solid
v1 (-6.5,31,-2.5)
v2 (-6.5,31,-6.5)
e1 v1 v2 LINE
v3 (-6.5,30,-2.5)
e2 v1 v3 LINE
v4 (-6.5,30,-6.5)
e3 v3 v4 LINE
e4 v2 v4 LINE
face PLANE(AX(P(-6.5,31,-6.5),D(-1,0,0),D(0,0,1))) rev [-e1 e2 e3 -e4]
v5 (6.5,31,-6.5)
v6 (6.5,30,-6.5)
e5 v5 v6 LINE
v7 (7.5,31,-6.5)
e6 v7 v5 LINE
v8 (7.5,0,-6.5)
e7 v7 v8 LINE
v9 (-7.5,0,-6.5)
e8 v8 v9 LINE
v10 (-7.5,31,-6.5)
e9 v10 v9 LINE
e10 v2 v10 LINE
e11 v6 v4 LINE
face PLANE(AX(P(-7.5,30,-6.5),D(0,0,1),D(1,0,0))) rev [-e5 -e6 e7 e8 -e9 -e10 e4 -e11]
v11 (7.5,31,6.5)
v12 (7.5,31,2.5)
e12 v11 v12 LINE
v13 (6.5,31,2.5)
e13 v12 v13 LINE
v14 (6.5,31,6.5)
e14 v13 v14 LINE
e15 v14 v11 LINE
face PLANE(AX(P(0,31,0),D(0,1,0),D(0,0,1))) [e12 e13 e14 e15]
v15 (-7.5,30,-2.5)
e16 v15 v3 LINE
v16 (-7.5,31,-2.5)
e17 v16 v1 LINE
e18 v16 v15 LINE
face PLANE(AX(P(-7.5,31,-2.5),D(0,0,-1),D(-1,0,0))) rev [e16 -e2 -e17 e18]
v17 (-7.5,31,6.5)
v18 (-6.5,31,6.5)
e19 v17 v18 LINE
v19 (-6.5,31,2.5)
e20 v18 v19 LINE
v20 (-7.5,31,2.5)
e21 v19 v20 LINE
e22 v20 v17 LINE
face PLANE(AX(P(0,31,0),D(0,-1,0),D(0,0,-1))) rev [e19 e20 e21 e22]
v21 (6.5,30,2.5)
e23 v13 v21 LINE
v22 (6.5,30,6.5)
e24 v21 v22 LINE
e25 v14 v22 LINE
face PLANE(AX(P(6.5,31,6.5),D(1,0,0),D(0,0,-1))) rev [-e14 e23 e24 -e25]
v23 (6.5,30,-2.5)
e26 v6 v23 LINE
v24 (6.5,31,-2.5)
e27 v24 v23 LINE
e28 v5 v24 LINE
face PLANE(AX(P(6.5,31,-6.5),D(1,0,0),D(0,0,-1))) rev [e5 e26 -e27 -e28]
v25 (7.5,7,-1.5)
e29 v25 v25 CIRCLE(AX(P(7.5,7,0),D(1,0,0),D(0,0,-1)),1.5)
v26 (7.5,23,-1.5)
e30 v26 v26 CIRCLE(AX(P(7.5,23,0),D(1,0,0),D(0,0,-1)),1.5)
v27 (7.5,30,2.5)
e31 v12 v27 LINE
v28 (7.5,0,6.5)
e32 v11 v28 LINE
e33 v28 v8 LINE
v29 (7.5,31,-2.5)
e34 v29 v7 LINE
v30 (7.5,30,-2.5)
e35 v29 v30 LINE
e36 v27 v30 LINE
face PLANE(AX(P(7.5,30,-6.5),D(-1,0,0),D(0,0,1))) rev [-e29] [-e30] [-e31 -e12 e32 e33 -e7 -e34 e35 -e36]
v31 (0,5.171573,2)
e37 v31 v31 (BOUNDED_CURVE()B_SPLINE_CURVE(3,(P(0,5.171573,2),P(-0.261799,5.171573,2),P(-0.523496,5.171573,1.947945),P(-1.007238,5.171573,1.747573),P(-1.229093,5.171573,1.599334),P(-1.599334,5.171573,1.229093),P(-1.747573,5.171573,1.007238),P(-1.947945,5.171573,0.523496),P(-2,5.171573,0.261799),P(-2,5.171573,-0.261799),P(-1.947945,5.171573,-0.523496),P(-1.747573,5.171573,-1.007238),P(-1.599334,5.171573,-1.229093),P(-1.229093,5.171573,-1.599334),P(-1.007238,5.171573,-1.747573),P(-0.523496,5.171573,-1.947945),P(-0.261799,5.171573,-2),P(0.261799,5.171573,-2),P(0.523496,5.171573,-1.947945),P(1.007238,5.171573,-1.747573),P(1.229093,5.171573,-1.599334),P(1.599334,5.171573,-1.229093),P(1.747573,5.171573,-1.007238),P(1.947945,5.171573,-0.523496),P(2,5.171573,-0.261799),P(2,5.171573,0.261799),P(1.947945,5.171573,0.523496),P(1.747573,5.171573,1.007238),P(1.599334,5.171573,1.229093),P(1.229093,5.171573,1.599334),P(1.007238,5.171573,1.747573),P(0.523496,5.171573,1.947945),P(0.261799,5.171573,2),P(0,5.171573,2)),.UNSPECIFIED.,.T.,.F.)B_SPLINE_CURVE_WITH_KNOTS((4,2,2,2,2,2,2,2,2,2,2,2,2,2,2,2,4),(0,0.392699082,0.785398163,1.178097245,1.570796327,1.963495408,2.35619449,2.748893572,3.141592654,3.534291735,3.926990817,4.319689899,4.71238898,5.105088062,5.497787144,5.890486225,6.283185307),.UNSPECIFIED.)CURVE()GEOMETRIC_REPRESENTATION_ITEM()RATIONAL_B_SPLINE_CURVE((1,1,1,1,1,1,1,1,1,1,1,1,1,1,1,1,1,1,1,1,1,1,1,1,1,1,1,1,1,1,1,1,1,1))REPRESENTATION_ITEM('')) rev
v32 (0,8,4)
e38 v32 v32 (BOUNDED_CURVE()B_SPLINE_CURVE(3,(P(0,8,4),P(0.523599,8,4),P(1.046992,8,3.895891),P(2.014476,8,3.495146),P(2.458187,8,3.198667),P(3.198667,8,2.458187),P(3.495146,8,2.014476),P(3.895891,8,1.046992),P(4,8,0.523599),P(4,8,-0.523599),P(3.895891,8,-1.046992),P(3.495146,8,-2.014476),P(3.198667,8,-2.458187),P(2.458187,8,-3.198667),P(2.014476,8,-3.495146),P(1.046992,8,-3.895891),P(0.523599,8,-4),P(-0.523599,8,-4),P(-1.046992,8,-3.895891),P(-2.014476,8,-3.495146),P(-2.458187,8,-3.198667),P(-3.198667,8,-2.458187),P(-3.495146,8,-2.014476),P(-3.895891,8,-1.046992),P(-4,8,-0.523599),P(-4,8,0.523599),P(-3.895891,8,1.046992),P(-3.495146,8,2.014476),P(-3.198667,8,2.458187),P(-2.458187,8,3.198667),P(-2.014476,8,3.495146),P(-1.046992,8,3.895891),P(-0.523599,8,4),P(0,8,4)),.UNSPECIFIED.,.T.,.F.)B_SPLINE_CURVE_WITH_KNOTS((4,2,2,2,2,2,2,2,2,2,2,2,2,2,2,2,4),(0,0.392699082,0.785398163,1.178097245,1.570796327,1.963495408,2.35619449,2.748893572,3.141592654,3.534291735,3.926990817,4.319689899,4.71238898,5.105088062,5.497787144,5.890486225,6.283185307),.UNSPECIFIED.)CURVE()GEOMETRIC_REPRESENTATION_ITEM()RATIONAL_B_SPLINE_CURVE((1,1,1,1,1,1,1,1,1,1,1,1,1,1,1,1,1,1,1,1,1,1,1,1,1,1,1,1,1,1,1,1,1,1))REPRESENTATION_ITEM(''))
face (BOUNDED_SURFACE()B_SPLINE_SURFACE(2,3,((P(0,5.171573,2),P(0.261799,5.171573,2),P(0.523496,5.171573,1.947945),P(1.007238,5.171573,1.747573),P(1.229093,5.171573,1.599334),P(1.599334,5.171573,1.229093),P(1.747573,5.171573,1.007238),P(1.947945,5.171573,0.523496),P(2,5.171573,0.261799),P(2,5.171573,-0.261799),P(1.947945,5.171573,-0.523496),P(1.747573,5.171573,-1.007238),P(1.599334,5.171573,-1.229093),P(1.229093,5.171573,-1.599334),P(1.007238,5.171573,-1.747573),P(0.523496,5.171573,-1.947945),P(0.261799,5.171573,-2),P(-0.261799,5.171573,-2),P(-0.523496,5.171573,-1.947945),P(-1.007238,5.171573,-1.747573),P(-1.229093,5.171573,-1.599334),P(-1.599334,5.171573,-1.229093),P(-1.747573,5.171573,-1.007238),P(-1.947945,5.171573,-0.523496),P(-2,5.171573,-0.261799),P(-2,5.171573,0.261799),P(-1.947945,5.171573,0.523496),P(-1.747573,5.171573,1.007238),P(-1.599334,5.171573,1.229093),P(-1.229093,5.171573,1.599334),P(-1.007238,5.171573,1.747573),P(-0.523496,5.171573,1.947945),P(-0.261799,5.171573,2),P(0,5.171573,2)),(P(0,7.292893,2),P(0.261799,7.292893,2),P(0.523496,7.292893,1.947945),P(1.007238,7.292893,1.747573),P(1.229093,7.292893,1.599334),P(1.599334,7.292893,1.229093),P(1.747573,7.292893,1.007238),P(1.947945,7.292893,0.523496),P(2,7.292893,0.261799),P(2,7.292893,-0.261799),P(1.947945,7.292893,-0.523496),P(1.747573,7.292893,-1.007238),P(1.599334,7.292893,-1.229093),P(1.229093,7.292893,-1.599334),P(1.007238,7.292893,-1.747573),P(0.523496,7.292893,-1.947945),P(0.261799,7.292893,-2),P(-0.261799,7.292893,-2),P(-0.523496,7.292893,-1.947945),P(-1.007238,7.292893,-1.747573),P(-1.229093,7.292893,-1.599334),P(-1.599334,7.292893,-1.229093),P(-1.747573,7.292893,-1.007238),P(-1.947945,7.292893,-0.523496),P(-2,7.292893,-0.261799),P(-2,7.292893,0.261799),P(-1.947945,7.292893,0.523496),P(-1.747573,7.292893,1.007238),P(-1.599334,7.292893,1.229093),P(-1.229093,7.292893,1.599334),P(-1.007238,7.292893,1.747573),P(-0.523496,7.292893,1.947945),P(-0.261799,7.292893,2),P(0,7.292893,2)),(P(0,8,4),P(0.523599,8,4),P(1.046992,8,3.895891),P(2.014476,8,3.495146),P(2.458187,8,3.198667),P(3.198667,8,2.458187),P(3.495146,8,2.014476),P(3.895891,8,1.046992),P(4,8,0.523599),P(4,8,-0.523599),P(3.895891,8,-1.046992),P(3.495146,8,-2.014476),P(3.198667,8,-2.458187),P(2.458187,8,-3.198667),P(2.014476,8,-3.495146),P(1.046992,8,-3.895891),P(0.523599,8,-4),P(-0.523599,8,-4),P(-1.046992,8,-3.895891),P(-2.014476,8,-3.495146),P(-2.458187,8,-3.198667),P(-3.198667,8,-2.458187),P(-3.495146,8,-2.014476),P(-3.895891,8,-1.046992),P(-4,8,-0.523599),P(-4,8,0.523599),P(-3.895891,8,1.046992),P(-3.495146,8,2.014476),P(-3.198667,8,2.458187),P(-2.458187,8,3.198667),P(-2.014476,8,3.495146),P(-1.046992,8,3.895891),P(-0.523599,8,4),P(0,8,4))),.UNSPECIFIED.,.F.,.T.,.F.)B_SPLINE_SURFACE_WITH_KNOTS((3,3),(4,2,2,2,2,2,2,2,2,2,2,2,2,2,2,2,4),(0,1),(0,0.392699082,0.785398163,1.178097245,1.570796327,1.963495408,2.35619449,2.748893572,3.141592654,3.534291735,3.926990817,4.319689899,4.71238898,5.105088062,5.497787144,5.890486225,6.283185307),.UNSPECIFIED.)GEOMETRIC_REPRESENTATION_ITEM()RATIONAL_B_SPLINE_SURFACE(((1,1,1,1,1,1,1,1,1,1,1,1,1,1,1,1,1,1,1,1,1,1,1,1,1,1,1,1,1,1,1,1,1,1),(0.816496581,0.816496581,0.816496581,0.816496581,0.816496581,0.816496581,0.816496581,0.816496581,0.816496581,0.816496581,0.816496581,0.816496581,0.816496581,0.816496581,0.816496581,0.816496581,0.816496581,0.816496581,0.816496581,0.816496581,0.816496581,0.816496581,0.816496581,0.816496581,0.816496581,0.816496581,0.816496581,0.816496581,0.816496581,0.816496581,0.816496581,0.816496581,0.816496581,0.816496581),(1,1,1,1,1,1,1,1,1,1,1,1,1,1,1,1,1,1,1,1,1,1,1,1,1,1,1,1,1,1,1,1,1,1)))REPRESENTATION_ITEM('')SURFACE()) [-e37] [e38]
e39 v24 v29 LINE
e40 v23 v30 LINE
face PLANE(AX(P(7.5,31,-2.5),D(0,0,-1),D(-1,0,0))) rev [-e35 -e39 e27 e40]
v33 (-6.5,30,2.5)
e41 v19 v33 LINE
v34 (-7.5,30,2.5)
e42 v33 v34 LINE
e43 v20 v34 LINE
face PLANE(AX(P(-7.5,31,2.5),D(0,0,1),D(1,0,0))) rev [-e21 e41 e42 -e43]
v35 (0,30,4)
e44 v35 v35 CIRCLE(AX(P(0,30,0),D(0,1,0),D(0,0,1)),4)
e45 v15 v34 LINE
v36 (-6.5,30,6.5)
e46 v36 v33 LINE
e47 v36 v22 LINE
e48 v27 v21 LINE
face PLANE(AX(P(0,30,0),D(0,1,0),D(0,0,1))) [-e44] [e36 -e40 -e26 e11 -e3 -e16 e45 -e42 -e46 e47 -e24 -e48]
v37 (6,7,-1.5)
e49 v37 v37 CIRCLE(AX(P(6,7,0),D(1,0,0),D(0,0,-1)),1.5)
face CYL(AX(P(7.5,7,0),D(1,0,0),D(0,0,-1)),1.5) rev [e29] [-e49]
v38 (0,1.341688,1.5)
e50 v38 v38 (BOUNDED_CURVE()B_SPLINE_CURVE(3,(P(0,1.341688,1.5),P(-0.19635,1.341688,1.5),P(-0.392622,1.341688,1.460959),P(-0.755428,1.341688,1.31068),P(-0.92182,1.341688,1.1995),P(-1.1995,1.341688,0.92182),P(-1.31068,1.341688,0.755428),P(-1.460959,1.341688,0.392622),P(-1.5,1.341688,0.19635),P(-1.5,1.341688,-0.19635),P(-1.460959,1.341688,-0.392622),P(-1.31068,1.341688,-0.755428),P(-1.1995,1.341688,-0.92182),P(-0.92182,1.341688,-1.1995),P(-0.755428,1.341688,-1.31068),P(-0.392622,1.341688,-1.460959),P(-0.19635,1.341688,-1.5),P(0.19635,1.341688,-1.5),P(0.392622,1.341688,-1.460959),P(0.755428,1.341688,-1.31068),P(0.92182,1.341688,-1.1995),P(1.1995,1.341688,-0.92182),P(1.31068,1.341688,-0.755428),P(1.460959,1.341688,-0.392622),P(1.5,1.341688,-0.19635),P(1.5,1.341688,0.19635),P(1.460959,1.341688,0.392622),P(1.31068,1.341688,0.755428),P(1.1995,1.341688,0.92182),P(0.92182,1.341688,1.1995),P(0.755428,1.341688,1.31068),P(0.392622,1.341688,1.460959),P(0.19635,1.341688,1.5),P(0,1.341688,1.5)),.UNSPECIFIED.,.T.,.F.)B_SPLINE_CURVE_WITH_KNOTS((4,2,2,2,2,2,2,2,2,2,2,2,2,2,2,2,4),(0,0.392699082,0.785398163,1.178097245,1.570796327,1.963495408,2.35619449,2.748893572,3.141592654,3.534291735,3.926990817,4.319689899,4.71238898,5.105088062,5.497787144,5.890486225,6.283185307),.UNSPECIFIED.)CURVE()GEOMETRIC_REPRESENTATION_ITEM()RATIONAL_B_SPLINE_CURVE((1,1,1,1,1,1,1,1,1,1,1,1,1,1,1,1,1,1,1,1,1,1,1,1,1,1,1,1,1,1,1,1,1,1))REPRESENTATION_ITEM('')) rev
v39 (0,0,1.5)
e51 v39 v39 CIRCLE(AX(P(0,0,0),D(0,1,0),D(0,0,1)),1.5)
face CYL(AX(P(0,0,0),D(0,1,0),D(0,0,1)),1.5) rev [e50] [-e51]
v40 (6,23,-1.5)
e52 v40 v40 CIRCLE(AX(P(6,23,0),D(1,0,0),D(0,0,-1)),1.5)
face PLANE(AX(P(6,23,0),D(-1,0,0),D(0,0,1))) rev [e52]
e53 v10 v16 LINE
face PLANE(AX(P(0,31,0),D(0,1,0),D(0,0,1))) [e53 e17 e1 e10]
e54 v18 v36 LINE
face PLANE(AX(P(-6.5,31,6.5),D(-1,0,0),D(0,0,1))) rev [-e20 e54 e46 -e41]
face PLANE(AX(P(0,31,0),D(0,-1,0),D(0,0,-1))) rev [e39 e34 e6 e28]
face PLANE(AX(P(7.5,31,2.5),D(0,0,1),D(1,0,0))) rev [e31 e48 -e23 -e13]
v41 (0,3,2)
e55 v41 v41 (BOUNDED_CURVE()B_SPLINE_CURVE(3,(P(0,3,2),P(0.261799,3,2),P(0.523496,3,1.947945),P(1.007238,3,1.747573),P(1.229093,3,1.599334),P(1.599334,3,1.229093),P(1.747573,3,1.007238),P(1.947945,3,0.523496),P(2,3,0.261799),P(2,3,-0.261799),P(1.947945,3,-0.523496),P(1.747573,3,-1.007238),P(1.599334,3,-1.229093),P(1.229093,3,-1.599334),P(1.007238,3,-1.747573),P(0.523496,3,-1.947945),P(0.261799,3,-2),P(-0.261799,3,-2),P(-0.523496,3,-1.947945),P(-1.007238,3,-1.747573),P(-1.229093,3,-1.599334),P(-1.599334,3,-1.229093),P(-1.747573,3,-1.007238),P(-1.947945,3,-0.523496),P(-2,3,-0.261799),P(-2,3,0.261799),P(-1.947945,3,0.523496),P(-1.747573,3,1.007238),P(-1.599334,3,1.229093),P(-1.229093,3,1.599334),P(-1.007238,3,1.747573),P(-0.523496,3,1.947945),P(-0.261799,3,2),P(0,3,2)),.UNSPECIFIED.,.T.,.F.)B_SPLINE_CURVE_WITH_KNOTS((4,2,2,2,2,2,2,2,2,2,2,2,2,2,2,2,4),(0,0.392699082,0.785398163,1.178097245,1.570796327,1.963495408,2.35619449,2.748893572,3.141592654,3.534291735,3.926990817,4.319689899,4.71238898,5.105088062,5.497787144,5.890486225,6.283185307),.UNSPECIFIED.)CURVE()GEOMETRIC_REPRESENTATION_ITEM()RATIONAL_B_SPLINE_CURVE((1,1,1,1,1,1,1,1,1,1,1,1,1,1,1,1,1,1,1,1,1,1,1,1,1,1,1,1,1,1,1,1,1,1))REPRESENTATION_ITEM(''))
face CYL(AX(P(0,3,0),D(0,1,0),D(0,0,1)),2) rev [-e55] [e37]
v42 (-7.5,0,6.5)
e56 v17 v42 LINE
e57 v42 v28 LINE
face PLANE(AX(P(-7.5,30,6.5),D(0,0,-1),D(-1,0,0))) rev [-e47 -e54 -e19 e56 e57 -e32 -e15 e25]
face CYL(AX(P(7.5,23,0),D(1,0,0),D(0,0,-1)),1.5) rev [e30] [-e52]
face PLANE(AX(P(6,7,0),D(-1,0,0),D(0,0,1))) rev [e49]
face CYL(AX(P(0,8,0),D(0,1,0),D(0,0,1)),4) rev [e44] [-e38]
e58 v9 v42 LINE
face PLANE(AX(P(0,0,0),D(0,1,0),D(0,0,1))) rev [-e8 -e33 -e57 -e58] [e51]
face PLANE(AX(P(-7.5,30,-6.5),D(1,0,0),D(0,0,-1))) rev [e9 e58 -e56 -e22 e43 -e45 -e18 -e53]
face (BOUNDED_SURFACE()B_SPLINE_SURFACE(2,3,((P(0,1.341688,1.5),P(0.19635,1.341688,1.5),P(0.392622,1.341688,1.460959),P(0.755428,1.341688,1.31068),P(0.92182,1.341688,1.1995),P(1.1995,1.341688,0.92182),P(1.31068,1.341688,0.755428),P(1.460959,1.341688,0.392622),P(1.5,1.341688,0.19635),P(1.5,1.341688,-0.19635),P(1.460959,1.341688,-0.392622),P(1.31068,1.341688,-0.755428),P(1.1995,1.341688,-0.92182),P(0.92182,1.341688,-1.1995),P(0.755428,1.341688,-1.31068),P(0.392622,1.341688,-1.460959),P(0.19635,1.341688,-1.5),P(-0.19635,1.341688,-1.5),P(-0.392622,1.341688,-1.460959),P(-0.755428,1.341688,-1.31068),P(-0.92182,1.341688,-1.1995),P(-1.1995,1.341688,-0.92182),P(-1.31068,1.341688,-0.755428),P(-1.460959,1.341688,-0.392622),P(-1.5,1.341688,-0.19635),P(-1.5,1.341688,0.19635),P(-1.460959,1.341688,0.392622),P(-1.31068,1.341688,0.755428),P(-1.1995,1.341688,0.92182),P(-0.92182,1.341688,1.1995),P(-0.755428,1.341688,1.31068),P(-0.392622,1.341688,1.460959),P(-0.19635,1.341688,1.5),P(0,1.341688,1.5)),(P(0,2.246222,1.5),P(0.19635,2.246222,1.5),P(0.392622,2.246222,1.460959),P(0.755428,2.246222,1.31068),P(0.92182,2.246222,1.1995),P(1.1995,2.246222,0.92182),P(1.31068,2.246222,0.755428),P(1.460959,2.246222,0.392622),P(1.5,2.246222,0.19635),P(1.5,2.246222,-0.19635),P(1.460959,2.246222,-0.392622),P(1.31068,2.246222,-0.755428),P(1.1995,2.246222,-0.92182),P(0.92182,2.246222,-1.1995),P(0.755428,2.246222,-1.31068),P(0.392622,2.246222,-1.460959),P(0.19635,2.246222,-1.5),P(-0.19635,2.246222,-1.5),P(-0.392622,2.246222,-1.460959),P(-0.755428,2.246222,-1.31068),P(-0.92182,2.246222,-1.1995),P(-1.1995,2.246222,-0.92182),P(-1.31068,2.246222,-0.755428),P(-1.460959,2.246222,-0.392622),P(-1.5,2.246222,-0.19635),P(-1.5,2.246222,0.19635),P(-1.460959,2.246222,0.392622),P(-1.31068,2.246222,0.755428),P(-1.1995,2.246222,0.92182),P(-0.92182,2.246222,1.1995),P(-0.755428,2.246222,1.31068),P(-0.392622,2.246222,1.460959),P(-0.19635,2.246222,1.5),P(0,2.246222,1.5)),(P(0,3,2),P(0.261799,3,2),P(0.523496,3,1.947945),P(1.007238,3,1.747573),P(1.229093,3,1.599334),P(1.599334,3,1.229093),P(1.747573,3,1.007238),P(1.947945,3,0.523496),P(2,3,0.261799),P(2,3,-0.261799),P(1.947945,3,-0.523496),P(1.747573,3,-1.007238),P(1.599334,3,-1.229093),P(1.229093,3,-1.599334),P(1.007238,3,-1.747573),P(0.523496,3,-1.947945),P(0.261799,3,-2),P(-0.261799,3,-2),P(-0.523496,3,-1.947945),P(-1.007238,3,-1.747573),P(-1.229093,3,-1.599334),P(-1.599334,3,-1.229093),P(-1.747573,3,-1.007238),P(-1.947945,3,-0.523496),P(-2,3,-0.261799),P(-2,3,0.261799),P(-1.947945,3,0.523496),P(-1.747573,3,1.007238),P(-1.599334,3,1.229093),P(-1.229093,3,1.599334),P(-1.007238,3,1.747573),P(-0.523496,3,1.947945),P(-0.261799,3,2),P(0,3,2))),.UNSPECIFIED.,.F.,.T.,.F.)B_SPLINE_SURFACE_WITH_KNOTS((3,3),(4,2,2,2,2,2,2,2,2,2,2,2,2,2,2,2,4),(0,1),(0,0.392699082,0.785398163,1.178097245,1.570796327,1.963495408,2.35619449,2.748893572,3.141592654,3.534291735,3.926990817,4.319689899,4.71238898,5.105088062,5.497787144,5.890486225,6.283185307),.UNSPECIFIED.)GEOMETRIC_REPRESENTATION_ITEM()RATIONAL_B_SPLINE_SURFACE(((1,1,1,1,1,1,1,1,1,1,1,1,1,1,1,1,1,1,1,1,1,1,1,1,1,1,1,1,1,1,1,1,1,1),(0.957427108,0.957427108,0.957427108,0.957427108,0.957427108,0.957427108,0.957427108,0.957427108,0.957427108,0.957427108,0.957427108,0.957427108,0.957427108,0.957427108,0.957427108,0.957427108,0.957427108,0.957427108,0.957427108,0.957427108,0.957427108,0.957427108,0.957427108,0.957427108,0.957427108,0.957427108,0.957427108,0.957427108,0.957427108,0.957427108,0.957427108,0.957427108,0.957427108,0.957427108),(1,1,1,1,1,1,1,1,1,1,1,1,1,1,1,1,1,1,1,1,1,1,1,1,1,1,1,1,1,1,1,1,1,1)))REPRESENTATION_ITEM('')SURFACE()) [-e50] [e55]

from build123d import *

# Parameters (mm, degrees)
SKETCH2_W                    = 15
SKETCH2_H                    = 13
BOSS_EXTRUDE1_DEPTH          = 30
SKETCH3_W                    = 1
SKETCH3_H                    = 4
BOSS_EXTRUDE2_DEPTH          = 1
SKETCH4_R                    = 4
CUT_EXTRUDE3_DEPTH           = 22
SKETCH5_R                    = 2
CUT_EXTRUDE4_DEPTH           = 5
SKETCH7_R                    = 1.5
CUT_EXTRUDE5_DEPTH           = 30.706901555
FILLET4_R                    = 3
FILLET5_R                    = 3
F_8_0_3_DIAMETER_HOLE1_D     = 3
F_8_0_3_DIAMETER_HOLE1_DEPTH = 1.5


with BuildPart() as part:
    # Sketch2 → Boss-Extrude1 (new body)
    with BuildSketch(Plane(origin=(0, 0, 0), x_dir=(1, 0, 0), z_dir=(0, 1, 0))):
        Rectangle(SKETCH2_W, SKETCH2_H)
    extrude(amount=BOSS_EXTRUDE1_DEPTH)

    # Sketch3 → Boss-Extrude2 (add)
    with BuildSketch(Plane(origin=(0, 30, 0), x_dir=(1, 0, 0), z_dir=(0, 1, 0))):
        with Locations((7, 4.5)):
            Rectangle(SKETCH3_W, SKETCH3_H)
        with Locations((7, -4.5)):
            Rectangle(SKETCH3_W, SKETCH3_H)
        with Locations((-7, -4.5)):
            Rectangle(SKETCH3_W, SKETCH3_H)
        with Locations((-7, 4.5)):
            Rectangle(SKETCH3_W, SKETCH3_H)
    extrude(amount=BOSS_EXTRUDE2_DEPTH)

    # Sketch4 → Cut-Extrude3 (cut)
    with BuildSketch(Plane(origin=(0, 30, 0), x_dir=(1, 0, 0), z_dir=(0, 1, 0))):
        with Locations(Location((0, 0, 0), (0, 0, 270))):
            Circle(SKETCH4_R)
    extrude(amount=-CUT_EXTRUDE3_DEPTH, mode=Mode.SUBTRACT)

    # Sketch5 → Cut-Extrude4 (cut)
    with BuildSketch(Plane(origin=(0, 8, 0), x_dir=(1, 0, 0), z_dir=(0, 1, 0))):
        with Locations(Location((0, 0, 0), (0, 0, 270))):
            Circle(SKETCH5_R)
    extrude(amount=-CUT_EXTRUDE4_DEPTH, mode=Mode.SUBTRACT)

    # Sketch7 → Cut-Extrude5 (cut, through all)
    with BuildSketch(Plane(origin=(0, 3, 0), x_dir=(1, 0, 0), z_dir=(0, 1, 0))):
        with Locations(Location((0, 0, 0), (0, 0, 270))):
            Circle(SKETCH7_R)
    extrude(amount=-CUT_EXTRUDE5_DEPTH, mode=Mode.SUBTRACT)

    # Fillet4
    # the kernel refuses this fillet: 3 mm, written as the material it takes off along each edge
    with BuildSketch(Plane(origin=(0, 8, 0), x_dir=(0, 0, 1), z_dir=(-1, 0, 0))) as fillet4_piece_1:
        with BuildLine():
            CenterArc((5, -2.828427125), FILLET4_R, 109.471220634, 70.528779366)
            Line((2, -2.828427125), (1.94, -2.828427125))
            Line((1.94, -2.828427125), (1.94, 0))
            Line((1.94, 0), (2, 0.06))
            ThreePointArc((2, 0.06), (3, 0.06), (3.98, 0.056568542))
            Line((3.98, 0.056568542), (4, 0))
        make_face()
    revolve(axis=Axis((0, 8, 0), (0, 1, 0)), mode=Mode.SUBTRACT)

    # Fillet5
    # the kernel refuses this fillet: 3 mm, written as the material it takes off along each edge
    with BuildSketch(Plane(origin=(0, 3, 0), x_dir=(0, 0, 1), z_dir=(-1, 0, 0))) as fillet5_piece_1:
        with BuildLine():
            CenterArc((4.5, -1.658312395), FILLET5_R, 146.442690238, 33.557309762)
            Line((2, 0), (1.95, 0.033166248))
            ThreePointArc((1.95, 0.033166248), (1.75, 0.06), (1.5, 0.06))
            Line((1.5, 0.06), (1.44, 0))
            Line((1.44, 0), (1.44, -1.658312395))
            Line((1.44, -1.658312395), (1.5, -1.658312395))
        make_face()
    revolve(axis=Axis((0, 3, 0), (0, 1, 0)), mode=Mode.SUBTRACT)

    # Ø8.0 (3) Diameter Hole1
    with Locations(Plane(origin=(7.5, 7, 0), x_dir=(0, 0, 1), z_dir=(1, 0, 0))):
        with Locations((0, 0), (0, -16)):
            Hole(F_8_0_3_DIAMETER_HOLE1_D / 2, depth=F_8_0_3_DIAMETER_HOLE1_DEPTH)


solid = part.part
